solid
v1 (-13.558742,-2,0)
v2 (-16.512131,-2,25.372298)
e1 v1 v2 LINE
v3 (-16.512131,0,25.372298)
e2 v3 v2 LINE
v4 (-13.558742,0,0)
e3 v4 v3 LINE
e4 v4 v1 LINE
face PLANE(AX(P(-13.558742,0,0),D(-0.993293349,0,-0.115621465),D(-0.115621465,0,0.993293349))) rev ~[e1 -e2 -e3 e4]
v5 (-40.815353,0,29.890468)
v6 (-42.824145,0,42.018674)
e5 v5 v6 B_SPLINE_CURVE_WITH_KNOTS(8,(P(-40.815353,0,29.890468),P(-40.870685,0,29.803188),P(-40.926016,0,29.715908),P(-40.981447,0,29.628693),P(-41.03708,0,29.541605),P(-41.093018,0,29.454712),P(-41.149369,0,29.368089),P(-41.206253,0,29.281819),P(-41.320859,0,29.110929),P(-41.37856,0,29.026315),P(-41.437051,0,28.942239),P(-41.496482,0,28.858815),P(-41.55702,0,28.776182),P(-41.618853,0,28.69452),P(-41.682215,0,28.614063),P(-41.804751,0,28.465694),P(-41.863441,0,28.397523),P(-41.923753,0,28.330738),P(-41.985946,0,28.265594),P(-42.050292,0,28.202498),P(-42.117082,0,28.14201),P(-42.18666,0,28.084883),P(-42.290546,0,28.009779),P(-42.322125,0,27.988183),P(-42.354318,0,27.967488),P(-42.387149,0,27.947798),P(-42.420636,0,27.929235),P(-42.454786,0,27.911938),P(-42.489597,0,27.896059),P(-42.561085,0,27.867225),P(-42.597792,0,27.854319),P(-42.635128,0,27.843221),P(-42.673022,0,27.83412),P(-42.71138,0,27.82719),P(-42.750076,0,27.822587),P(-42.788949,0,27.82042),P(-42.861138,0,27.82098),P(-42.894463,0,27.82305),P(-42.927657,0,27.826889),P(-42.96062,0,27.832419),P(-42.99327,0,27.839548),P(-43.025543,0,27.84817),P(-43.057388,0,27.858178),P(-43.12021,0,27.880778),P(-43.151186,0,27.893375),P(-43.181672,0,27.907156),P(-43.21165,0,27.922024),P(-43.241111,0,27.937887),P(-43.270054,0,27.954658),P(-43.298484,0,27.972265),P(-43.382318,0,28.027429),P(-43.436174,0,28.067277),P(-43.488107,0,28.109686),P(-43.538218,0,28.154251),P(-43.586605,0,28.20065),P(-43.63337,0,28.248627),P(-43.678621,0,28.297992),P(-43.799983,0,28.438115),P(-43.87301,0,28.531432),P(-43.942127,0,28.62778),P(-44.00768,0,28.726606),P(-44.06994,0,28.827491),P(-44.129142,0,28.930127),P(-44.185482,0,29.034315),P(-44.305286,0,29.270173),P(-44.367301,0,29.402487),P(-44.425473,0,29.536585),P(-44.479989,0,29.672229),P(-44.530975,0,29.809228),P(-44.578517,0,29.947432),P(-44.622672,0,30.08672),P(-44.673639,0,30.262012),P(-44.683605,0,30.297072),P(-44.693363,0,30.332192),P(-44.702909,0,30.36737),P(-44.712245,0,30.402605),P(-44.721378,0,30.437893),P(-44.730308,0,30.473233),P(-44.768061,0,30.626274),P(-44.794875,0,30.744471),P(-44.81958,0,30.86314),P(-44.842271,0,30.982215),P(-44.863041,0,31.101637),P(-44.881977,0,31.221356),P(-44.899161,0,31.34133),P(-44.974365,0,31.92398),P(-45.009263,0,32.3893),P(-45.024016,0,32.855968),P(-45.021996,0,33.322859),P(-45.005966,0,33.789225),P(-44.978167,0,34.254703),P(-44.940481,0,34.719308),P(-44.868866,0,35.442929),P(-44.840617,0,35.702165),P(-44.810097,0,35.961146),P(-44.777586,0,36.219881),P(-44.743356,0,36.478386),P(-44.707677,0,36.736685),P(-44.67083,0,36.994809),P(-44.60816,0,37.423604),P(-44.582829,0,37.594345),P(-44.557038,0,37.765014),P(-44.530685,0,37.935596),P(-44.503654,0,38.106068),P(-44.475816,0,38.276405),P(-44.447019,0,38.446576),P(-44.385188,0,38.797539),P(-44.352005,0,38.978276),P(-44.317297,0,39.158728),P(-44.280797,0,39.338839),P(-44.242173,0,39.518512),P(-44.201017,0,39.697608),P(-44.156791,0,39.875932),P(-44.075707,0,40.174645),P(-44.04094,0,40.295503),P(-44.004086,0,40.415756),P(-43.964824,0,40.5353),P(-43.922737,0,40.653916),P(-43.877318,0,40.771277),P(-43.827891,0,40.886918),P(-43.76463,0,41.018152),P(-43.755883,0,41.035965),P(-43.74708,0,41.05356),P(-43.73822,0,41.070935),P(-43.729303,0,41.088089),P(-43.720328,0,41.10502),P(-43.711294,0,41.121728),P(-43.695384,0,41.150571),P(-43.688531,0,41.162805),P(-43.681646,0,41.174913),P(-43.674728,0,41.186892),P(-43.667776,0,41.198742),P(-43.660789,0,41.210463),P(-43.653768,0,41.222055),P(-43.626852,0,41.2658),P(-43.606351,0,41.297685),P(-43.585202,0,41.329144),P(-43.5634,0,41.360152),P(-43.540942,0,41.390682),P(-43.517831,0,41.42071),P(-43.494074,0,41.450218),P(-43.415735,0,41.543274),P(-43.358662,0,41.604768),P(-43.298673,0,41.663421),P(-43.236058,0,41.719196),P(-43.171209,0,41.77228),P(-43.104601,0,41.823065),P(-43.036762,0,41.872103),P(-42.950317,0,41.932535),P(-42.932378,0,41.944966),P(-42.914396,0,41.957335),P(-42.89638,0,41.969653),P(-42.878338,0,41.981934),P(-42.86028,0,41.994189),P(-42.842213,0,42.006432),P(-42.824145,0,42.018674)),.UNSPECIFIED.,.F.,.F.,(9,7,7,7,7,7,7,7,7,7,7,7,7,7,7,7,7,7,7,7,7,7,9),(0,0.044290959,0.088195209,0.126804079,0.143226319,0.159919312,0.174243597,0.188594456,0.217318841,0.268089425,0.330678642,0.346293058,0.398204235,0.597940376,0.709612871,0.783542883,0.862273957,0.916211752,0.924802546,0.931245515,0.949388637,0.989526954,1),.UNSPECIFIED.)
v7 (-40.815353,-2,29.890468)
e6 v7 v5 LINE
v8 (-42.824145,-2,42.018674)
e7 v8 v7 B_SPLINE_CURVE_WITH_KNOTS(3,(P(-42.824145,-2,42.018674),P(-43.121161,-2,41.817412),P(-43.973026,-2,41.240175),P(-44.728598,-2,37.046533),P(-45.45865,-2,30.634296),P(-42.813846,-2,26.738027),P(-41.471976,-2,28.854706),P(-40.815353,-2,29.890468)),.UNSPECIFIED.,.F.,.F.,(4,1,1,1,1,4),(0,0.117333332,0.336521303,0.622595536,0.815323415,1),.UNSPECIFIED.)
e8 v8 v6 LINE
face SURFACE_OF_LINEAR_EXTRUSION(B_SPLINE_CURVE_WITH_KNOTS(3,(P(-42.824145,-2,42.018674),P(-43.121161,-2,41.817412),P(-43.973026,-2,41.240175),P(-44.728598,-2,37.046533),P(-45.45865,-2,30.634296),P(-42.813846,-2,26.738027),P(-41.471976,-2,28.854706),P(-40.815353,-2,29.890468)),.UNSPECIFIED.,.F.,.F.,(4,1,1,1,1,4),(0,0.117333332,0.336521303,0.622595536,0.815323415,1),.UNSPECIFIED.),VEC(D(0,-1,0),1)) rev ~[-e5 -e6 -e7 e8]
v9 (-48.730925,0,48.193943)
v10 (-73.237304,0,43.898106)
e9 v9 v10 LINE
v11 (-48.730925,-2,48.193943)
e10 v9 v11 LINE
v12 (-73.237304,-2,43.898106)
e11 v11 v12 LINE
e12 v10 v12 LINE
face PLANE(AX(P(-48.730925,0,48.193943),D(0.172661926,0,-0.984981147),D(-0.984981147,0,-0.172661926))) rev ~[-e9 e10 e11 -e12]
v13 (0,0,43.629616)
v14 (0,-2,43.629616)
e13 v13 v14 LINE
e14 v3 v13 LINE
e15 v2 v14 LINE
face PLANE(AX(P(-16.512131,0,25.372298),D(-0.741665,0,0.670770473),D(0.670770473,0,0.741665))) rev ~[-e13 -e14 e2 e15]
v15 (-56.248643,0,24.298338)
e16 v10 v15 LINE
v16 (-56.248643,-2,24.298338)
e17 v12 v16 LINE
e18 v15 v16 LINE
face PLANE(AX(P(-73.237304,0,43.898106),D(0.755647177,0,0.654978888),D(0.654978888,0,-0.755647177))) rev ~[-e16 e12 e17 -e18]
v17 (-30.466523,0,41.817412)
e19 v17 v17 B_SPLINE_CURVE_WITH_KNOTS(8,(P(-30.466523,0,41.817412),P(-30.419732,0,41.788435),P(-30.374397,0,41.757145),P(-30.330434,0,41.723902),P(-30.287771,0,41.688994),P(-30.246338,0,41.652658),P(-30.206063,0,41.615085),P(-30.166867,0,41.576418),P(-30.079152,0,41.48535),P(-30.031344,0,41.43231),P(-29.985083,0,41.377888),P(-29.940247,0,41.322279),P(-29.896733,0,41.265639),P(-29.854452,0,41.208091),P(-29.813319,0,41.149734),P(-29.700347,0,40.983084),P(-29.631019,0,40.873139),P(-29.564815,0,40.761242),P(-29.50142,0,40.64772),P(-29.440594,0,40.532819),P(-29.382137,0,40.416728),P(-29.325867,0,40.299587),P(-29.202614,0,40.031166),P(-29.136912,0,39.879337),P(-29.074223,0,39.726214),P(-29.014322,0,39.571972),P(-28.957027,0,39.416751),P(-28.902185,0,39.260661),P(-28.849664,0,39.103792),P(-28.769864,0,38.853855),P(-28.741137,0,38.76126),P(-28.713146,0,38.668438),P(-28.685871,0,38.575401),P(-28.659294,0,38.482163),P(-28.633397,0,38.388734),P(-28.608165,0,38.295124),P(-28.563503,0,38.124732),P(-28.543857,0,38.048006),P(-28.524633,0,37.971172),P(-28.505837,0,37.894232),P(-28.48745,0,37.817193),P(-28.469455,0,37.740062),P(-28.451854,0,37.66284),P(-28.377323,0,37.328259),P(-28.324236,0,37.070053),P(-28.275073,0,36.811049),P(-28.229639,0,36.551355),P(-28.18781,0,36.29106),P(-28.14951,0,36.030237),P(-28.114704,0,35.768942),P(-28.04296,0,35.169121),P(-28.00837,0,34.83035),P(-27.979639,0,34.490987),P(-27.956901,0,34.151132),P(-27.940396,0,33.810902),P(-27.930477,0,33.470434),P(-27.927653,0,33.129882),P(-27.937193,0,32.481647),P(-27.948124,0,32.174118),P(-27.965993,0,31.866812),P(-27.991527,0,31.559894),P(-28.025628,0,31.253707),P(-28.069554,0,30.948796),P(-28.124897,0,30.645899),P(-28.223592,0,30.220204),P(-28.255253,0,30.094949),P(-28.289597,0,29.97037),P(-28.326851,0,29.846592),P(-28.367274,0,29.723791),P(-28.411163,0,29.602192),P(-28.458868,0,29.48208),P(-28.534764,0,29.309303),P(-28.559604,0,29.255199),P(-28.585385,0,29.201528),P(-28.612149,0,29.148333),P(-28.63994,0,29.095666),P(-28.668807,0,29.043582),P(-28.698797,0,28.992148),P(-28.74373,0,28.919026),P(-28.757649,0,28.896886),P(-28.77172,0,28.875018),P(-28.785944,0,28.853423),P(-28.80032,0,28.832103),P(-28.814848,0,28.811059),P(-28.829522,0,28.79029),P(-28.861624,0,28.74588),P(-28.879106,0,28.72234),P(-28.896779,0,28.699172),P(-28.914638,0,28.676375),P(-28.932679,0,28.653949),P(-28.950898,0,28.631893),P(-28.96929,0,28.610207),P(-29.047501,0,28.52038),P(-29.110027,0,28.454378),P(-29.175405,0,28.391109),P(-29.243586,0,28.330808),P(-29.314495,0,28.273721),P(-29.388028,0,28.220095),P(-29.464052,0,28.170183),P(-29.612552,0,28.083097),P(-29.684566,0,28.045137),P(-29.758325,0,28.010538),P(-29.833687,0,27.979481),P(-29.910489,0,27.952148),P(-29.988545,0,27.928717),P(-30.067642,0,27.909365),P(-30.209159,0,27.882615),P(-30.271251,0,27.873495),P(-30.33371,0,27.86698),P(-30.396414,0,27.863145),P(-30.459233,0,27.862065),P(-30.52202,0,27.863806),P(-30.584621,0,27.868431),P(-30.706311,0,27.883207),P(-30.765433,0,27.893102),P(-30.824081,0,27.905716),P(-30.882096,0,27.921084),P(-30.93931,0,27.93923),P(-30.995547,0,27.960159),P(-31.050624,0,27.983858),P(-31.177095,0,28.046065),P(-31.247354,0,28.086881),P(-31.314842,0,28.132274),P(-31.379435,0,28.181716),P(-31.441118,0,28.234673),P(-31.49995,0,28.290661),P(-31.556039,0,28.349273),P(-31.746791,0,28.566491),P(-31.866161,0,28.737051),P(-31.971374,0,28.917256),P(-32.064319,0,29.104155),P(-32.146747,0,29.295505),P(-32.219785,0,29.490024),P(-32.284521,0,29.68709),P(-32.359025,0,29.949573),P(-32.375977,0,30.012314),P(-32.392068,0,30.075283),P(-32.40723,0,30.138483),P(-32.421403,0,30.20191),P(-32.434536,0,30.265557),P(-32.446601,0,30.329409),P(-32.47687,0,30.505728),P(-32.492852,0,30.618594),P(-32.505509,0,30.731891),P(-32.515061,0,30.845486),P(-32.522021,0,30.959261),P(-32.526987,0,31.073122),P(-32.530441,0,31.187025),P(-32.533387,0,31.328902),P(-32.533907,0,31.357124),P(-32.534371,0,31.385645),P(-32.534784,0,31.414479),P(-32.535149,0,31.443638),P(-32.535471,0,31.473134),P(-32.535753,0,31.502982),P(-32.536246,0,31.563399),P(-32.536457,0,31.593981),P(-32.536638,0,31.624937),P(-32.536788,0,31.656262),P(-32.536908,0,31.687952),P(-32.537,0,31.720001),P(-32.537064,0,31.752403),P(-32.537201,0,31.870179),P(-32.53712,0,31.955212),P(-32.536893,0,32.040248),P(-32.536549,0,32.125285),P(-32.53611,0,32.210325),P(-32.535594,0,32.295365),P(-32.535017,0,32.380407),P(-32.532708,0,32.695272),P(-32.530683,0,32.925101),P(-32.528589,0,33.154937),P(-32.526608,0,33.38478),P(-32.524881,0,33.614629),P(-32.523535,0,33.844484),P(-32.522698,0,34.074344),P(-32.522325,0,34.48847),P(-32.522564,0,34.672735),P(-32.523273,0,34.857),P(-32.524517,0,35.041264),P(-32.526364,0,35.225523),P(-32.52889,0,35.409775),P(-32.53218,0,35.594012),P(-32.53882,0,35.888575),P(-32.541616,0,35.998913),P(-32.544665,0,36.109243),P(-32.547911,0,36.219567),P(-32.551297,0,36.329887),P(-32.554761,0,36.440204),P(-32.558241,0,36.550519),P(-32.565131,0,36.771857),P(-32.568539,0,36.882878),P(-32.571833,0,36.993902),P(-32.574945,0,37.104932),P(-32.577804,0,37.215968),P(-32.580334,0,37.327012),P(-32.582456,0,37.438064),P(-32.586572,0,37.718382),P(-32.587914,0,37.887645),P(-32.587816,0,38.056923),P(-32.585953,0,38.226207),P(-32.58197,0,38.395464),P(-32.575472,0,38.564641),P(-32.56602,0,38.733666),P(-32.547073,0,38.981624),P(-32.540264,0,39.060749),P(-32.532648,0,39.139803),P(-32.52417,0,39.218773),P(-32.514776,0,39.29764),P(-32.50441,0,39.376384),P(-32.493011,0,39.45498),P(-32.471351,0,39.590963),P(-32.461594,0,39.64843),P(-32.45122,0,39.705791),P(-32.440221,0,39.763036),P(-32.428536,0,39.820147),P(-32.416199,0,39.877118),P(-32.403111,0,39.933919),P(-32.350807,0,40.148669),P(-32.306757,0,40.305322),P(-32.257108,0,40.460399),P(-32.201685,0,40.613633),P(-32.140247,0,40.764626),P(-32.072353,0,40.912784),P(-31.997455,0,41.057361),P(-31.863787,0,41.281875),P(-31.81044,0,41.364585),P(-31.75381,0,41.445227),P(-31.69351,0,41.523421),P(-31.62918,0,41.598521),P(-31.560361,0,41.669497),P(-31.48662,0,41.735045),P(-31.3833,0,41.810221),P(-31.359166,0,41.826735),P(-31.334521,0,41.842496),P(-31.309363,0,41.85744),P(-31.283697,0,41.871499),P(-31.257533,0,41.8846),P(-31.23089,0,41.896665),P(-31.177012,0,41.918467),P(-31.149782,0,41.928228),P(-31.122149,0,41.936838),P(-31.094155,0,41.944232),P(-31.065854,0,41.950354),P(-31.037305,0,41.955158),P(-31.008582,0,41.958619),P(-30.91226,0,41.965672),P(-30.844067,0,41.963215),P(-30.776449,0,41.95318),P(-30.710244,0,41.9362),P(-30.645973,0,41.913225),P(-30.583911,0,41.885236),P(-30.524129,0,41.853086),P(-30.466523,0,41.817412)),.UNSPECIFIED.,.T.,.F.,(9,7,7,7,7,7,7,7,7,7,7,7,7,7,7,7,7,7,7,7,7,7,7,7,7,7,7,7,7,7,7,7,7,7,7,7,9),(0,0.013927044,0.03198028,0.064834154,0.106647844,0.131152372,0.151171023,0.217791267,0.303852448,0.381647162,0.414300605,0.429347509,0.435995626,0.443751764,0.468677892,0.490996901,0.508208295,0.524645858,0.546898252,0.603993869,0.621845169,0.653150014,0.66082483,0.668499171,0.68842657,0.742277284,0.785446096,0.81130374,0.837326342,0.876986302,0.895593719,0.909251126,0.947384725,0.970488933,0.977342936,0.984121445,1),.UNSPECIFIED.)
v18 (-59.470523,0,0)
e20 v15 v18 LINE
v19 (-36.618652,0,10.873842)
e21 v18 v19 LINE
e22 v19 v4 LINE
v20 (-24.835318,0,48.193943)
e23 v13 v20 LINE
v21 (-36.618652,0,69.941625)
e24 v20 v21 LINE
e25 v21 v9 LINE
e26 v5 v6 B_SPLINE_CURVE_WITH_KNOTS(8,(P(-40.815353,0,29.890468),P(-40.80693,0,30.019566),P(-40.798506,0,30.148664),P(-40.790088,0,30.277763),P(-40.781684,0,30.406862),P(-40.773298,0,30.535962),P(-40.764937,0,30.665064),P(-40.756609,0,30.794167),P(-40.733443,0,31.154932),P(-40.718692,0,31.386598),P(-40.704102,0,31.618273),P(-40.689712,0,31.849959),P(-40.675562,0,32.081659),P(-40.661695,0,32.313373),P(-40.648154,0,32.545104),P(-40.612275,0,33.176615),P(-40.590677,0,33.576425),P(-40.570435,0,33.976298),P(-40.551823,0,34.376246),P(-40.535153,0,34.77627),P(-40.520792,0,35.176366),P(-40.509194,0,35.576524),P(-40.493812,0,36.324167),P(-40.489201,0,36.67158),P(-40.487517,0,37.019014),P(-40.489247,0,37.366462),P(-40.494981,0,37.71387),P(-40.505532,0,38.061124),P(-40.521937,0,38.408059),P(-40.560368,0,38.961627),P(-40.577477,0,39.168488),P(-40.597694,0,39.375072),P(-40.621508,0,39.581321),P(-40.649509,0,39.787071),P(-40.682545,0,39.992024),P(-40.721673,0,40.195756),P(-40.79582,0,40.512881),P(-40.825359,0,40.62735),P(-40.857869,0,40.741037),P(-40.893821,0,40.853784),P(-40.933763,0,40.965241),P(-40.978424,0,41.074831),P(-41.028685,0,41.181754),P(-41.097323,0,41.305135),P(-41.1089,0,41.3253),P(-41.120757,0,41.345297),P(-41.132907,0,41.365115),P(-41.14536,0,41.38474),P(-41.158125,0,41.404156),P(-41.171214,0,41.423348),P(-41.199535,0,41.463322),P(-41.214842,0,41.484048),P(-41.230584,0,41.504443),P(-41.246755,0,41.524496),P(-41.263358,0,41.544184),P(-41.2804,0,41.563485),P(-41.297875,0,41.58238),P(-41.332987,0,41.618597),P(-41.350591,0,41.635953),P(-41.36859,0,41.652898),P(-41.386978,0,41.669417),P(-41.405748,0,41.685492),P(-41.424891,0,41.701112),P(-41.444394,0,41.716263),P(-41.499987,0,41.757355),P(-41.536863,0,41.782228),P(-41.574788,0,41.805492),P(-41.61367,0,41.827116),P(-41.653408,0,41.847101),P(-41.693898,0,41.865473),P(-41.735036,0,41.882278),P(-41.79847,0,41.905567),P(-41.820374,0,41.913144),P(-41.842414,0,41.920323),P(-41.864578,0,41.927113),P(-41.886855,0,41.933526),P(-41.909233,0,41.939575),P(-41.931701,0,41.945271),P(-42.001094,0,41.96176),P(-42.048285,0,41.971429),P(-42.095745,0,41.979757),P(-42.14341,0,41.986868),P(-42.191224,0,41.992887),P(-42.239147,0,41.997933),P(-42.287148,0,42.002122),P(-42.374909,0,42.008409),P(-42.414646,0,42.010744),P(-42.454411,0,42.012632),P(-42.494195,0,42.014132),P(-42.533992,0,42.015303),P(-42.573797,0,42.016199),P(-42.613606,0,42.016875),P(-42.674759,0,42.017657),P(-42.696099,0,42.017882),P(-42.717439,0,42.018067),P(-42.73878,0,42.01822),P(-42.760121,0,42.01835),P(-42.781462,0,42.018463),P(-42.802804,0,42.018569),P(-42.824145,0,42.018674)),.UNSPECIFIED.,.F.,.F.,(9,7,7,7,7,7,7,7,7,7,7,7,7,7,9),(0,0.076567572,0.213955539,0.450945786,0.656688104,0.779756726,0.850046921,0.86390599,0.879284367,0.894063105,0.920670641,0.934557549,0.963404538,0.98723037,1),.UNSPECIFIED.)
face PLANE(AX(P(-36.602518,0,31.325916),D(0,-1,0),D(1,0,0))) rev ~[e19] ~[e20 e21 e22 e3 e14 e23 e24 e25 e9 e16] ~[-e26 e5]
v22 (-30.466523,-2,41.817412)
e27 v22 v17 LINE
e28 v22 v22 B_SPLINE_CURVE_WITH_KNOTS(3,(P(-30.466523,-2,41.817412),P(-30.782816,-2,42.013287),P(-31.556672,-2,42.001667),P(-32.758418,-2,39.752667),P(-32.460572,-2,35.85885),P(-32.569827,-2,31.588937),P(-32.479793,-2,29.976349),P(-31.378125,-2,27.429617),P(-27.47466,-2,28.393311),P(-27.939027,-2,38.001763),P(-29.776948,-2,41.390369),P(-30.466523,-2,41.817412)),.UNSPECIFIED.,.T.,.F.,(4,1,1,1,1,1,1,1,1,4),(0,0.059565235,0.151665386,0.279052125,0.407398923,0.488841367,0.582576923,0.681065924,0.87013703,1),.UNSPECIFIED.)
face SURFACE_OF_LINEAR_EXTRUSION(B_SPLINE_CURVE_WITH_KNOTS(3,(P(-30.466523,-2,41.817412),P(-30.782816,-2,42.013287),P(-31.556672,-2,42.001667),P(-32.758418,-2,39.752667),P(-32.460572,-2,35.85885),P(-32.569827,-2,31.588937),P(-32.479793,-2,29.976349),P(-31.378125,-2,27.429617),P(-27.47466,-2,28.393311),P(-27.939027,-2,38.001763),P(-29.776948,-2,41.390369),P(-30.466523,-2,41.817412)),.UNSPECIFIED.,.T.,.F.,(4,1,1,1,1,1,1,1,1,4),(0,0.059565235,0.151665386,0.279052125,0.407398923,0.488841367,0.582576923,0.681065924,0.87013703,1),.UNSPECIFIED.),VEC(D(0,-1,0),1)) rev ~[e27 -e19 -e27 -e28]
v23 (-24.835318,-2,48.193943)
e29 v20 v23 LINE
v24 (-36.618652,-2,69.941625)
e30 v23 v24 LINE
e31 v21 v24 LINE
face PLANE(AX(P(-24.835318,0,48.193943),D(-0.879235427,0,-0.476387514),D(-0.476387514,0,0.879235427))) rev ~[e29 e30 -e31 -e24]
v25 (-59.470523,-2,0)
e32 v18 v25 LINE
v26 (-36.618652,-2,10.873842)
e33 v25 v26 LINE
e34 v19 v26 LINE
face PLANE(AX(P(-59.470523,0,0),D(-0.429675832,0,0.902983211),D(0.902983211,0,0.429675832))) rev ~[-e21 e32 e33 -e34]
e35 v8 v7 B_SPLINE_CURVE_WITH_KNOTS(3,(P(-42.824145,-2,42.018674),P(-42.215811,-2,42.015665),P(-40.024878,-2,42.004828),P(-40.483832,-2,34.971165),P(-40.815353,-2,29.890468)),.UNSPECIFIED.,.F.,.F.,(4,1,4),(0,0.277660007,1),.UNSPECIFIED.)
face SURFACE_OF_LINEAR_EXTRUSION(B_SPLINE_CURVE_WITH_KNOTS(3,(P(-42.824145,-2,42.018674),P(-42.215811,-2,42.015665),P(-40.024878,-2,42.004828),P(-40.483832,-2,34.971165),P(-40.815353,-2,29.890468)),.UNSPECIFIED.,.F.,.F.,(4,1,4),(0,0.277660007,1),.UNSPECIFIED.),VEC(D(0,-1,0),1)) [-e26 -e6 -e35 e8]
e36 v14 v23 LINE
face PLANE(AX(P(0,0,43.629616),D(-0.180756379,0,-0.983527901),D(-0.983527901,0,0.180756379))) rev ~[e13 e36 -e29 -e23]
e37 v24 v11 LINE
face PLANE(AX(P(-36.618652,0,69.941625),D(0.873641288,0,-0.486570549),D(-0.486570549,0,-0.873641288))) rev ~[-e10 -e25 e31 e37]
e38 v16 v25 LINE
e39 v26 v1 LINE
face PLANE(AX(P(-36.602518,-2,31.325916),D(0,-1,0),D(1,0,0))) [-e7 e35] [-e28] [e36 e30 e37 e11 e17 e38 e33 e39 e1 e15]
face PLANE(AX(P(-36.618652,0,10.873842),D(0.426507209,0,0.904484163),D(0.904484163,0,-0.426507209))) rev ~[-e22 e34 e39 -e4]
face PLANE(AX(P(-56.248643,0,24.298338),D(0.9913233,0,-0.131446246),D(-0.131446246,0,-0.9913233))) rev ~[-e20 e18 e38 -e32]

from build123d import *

# Parameters (mm, degrees)
F1_DEPTH = 2
F3_DEPTH = 25


with BuildPart() as f1:
    # F0 (on Front) → F1 (new body)
    with BuildSketch(Plane.XZ):
        Polygon((-48.7309247255, 48.1939427555), (-73.2373036639, 43.8981056213), (-56.2486425042, 24.2983382195), (-59.4705231488, 0), (-36.618651832, 10.8738420531), (-13.5587416589, 0), (-16.5121313184, 25.3722984344), (0, 43.6296164989), (-24.835318327, 48.1939427555), (-36.618651832, 69.941624999), align=None)
    extrude(amount=F1_DEPTH)

    # F2 (on face) → F3 (cut)
    with BuildSketch(Plane.XZ.offset(2)):
        with BuildLine():
            add(Edge.make_bspline(
                [(-42.8241454065, 42.018674314), (-42.215811031, 42.0156652147), (-40.0248783805, 42.0048278626), (-40.4838324873, 34.9711646084), (-40.8153533936, 29.8904683441)],
                knots=[0, 0, 0, 0, 0.2776600072, 1, 1, 1, 1], degree=3))
            add(Edge.make_bspline(
                [(-42.8241454065, 42.018674314), (-43.1211611971, 41.817411735), (-43.9730260473, 41.2401746918), (-44.7285981197, 37.046533313), (-45.4586501607, 30.6342959102), (-42.8138464069, 26.7380268066), (-41.4719755399, 28.85470644), (-40.8153533936, 29.8904683441)],
                knots=[0, 0, 0, 0, 0.1173333317, 0.3365213034, 0.622595536, 0.815323415, 1, 1, 1, 1], degree=3))
        make_face()
        with BuildLine():
            add(Edge.make_bspline(
                [(-30.4665230215, 41.817411735), (-30.7828157907, 42.0132867548), (-31.5566720158, 42.0016665583), (-32.758418401, 39.7526667198), (-32.4605723261, 35.8588497009), (-32.5698270564, 31.5889371812), (-32.4797926297, 29.976349033), (-31.378124697, 27.4296174444), (-27.4746603802, 28.3933105876), (-27.939027342, 38.0017634716), (-29.776947659, 41.3903688148), (-30.4665230215, 41.817411735)],
                knots=[0, 0, 0, 0, 0.0595652349, 0.1516653863, 0.2790521251, 0.4073989231, 0.4888413673, 0.5825769232, 0.6810659238, 0.8701370299, 1, 1, 1, 1], degree=3))
        make_face()
    extrude(amount=-F3_DEPTH, mode=Mode.SUBTRACT)


solid = f1.part
